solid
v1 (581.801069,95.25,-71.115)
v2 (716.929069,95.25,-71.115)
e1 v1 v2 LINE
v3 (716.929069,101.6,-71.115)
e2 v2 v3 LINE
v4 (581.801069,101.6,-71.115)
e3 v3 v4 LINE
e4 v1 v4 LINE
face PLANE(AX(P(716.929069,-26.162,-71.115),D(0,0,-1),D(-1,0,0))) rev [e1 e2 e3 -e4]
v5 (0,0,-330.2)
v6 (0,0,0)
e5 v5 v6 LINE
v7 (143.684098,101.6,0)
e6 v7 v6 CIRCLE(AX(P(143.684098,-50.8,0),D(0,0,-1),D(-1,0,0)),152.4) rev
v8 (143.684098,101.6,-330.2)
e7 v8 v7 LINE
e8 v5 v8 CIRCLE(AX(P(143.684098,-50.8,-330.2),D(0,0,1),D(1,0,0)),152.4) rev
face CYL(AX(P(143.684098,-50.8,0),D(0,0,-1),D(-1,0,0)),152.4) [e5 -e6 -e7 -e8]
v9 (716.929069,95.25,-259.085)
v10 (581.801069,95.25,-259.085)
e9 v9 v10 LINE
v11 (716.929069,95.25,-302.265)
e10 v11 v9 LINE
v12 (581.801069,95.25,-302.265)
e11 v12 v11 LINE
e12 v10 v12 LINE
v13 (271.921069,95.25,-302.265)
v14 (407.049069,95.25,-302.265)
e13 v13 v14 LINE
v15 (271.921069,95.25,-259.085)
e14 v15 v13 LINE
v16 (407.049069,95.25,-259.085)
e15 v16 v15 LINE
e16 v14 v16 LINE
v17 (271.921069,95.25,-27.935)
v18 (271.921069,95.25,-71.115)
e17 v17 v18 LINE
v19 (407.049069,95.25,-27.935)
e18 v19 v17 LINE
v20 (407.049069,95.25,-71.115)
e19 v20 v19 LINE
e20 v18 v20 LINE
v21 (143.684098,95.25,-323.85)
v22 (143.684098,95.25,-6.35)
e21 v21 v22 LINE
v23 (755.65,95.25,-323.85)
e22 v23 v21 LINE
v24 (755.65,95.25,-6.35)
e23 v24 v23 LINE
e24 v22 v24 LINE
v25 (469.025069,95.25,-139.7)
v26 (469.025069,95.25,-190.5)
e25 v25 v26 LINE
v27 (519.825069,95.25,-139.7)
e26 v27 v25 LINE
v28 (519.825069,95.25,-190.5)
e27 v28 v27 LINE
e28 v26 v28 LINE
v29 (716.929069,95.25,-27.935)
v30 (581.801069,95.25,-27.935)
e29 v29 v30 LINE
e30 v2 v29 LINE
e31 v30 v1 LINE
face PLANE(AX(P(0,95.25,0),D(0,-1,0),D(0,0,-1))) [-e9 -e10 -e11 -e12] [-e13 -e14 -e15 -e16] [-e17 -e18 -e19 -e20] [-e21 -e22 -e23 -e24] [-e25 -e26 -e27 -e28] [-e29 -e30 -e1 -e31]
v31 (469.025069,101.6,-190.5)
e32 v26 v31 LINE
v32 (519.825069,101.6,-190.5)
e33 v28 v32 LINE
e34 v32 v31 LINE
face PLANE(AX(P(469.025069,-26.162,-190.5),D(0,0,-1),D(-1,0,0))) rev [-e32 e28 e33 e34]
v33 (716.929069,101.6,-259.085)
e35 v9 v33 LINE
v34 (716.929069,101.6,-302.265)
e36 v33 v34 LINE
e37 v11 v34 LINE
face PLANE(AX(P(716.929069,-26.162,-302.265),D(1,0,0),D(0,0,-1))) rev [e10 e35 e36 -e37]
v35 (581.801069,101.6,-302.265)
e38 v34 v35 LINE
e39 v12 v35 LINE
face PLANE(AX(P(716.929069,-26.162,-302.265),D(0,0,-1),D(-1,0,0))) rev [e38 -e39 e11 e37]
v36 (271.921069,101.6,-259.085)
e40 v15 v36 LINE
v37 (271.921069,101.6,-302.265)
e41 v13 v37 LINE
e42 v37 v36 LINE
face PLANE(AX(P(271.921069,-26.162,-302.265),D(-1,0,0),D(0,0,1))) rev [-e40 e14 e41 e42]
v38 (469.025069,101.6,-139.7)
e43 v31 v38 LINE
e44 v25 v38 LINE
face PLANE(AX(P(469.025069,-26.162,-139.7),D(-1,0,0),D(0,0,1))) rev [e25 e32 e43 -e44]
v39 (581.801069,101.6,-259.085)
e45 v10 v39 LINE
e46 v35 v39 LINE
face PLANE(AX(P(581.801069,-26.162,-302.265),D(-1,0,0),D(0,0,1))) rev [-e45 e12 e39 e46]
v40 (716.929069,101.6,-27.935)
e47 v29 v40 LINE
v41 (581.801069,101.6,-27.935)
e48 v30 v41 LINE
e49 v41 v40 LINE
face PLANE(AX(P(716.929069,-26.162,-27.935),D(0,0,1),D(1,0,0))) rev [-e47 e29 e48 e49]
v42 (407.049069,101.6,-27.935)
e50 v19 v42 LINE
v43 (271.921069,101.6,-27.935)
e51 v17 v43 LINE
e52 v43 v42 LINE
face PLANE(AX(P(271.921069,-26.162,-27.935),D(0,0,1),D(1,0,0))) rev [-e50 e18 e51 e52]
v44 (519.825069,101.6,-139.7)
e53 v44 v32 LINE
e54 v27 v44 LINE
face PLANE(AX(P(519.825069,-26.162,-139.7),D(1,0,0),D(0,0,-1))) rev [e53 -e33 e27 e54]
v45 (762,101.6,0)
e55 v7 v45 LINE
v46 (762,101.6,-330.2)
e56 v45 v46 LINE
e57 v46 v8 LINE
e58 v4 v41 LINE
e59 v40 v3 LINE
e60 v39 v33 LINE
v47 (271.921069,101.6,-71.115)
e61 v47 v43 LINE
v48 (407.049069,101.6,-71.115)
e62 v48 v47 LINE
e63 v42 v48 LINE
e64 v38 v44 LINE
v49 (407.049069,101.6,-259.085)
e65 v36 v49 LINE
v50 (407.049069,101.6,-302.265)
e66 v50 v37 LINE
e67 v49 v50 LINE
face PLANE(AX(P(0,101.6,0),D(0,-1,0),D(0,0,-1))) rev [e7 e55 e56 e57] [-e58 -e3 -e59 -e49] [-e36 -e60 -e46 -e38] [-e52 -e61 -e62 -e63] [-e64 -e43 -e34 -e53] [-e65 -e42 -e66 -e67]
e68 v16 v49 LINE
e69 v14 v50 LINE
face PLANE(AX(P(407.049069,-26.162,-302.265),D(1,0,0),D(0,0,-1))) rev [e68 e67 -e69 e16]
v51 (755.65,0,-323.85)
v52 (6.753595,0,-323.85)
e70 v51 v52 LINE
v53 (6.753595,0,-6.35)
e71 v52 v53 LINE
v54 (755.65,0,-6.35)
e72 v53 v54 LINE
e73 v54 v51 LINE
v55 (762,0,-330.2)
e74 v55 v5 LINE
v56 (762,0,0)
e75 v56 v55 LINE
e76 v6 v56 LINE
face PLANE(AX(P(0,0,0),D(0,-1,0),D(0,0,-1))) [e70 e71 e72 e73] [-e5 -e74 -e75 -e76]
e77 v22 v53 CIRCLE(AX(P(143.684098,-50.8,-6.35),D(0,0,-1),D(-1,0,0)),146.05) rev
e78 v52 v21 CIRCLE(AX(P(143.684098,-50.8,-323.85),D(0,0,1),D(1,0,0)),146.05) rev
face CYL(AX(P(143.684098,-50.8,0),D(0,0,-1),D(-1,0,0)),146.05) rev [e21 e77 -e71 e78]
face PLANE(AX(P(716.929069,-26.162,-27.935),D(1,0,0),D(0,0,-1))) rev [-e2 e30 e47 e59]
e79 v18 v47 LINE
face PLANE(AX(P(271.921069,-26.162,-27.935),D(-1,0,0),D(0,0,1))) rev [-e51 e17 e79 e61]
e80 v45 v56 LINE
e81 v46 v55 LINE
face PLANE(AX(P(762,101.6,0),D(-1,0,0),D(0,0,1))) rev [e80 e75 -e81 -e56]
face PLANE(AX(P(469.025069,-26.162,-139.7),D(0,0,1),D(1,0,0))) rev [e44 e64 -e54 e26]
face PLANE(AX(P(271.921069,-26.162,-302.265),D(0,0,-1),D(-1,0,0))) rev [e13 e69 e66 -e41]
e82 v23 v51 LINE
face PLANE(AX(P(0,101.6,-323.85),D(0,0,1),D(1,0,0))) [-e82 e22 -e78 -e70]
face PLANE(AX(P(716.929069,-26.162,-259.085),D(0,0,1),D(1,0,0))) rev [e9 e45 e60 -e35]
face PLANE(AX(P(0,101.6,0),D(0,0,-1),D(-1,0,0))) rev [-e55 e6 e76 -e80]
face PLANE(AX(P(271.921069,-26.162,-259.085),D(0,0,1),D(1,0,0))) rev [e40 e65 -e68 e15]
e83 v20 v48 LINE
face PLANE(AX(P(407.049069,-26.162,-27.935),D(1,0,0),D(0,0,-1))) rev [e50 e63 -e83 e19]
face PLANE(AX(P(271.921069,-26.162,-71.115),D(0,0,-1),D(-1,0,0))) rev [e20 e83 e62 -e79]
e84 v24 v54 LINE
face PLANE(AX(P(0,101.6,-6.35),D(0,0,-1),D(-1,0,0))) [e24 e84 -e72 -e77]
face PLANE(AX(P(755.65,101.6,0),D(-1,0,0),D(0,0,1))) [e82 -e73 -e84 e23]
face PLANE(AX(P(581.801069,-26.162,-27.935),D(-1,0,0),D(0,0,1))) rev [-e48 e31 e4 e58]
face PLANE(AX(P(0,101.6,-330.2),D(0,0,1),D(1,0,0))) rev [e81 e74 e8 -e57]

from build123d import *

# Parameters (mm, degrees)
SKETCH1_W           = 762
SKETCH1_H           = 330.2
BOSS_EXTRUDE1_DEPTH = 101.6
FILLET1_R           = 152.4
SHELL1_T            = -6.35
SKETCH3_W           = 135.128
SKETCH3_H           = 43.18
SKETCH3_W_2         = 50.8
SKETCH3_H_2         = 50.8
CUT_EXTRUDE1_DEPTH  = 127.762


with BuildPart() as part:
    # Sketch1 → Boss-Extrude1 (new body)
    with BuildSketch(Plane(origin=(0, 0, 0), x_dir=(1, 0, 0), z_dir=(0, 1, 0))):
        with Locations((381, 165.1)):
            Rectangle(SKETCH1_W, SKETCH1_H)
    extrude(amount=BOSS_EXTRUDE1_DEPTH)

    # Fillet1
    # the kernel refuses this fillet: 152.4 mm, written as the material it takes off along each edge
    with BuildSketch(Plane(origin=(0, 101.6, -689.410244843), x_dir=(0, -1, 0), z_dir=(0, 0, 1))) as fillet1_piece_1:
        with BuildLine():
            CenterArc((152.4, 143.684097937), FILLET1_R, 180, 70.528779366)
            Line((0, 143.684097937), (-3.048, 143.684097937))
            Line((-3.048, 143.684097937), (-3.048, 0))
            Line((-3.048, 0), (0, -3.048))
            ThreePointArc((0, -3.048), (50.8, -3.048), (100.584, -2.873681959))
            Line((100.584, -2.873681959), (101.6, 0))
        make_face()
    extrude(amount=1048.620489686, mode=Mode.SUBTRACT)

    # Shell1
    shell1_openings = [part.faces().sort_by_distance(p)[0] for p in [
        (381, 0, -165.1),
    ]]
    offset(amount=SHELL1_T, openings=shell1_openings, kind=Kind.INTERSECTION)

    # Sketch3 → Cut-Extrude1 (cut)
    with BuildSketch(Plane(origin=(0, 101.6, 0), x_dir=(1, 0, 0), z_dir=(0, 1, 0))):
        with Locations((339.485069024, 49.525)):
            Rectangle(SKETCH3_W, SKETCH3_H)
        with Locations((649.365069024, 280.675)):
            Rectangle(SKETCH3_W, SKETCH3_H)
        with Locations((649.365069024, 49.525)):
            Rectangle(SKETCH3_W, SKETCH3_H)
        with Locations((339.485069024, 280.675)):
            Rectangle(SKETCH3_W, SKETCH3_H)
        with Locations((494.425069024, 165.1)):
            Rectangle(SKETCH3_W_2, SKETCH3_H_2)
    extrude(amount=-CUT_EXTRUDE1_DEPTH, mode=Mode.SUBTRACT)


solid = part.part
